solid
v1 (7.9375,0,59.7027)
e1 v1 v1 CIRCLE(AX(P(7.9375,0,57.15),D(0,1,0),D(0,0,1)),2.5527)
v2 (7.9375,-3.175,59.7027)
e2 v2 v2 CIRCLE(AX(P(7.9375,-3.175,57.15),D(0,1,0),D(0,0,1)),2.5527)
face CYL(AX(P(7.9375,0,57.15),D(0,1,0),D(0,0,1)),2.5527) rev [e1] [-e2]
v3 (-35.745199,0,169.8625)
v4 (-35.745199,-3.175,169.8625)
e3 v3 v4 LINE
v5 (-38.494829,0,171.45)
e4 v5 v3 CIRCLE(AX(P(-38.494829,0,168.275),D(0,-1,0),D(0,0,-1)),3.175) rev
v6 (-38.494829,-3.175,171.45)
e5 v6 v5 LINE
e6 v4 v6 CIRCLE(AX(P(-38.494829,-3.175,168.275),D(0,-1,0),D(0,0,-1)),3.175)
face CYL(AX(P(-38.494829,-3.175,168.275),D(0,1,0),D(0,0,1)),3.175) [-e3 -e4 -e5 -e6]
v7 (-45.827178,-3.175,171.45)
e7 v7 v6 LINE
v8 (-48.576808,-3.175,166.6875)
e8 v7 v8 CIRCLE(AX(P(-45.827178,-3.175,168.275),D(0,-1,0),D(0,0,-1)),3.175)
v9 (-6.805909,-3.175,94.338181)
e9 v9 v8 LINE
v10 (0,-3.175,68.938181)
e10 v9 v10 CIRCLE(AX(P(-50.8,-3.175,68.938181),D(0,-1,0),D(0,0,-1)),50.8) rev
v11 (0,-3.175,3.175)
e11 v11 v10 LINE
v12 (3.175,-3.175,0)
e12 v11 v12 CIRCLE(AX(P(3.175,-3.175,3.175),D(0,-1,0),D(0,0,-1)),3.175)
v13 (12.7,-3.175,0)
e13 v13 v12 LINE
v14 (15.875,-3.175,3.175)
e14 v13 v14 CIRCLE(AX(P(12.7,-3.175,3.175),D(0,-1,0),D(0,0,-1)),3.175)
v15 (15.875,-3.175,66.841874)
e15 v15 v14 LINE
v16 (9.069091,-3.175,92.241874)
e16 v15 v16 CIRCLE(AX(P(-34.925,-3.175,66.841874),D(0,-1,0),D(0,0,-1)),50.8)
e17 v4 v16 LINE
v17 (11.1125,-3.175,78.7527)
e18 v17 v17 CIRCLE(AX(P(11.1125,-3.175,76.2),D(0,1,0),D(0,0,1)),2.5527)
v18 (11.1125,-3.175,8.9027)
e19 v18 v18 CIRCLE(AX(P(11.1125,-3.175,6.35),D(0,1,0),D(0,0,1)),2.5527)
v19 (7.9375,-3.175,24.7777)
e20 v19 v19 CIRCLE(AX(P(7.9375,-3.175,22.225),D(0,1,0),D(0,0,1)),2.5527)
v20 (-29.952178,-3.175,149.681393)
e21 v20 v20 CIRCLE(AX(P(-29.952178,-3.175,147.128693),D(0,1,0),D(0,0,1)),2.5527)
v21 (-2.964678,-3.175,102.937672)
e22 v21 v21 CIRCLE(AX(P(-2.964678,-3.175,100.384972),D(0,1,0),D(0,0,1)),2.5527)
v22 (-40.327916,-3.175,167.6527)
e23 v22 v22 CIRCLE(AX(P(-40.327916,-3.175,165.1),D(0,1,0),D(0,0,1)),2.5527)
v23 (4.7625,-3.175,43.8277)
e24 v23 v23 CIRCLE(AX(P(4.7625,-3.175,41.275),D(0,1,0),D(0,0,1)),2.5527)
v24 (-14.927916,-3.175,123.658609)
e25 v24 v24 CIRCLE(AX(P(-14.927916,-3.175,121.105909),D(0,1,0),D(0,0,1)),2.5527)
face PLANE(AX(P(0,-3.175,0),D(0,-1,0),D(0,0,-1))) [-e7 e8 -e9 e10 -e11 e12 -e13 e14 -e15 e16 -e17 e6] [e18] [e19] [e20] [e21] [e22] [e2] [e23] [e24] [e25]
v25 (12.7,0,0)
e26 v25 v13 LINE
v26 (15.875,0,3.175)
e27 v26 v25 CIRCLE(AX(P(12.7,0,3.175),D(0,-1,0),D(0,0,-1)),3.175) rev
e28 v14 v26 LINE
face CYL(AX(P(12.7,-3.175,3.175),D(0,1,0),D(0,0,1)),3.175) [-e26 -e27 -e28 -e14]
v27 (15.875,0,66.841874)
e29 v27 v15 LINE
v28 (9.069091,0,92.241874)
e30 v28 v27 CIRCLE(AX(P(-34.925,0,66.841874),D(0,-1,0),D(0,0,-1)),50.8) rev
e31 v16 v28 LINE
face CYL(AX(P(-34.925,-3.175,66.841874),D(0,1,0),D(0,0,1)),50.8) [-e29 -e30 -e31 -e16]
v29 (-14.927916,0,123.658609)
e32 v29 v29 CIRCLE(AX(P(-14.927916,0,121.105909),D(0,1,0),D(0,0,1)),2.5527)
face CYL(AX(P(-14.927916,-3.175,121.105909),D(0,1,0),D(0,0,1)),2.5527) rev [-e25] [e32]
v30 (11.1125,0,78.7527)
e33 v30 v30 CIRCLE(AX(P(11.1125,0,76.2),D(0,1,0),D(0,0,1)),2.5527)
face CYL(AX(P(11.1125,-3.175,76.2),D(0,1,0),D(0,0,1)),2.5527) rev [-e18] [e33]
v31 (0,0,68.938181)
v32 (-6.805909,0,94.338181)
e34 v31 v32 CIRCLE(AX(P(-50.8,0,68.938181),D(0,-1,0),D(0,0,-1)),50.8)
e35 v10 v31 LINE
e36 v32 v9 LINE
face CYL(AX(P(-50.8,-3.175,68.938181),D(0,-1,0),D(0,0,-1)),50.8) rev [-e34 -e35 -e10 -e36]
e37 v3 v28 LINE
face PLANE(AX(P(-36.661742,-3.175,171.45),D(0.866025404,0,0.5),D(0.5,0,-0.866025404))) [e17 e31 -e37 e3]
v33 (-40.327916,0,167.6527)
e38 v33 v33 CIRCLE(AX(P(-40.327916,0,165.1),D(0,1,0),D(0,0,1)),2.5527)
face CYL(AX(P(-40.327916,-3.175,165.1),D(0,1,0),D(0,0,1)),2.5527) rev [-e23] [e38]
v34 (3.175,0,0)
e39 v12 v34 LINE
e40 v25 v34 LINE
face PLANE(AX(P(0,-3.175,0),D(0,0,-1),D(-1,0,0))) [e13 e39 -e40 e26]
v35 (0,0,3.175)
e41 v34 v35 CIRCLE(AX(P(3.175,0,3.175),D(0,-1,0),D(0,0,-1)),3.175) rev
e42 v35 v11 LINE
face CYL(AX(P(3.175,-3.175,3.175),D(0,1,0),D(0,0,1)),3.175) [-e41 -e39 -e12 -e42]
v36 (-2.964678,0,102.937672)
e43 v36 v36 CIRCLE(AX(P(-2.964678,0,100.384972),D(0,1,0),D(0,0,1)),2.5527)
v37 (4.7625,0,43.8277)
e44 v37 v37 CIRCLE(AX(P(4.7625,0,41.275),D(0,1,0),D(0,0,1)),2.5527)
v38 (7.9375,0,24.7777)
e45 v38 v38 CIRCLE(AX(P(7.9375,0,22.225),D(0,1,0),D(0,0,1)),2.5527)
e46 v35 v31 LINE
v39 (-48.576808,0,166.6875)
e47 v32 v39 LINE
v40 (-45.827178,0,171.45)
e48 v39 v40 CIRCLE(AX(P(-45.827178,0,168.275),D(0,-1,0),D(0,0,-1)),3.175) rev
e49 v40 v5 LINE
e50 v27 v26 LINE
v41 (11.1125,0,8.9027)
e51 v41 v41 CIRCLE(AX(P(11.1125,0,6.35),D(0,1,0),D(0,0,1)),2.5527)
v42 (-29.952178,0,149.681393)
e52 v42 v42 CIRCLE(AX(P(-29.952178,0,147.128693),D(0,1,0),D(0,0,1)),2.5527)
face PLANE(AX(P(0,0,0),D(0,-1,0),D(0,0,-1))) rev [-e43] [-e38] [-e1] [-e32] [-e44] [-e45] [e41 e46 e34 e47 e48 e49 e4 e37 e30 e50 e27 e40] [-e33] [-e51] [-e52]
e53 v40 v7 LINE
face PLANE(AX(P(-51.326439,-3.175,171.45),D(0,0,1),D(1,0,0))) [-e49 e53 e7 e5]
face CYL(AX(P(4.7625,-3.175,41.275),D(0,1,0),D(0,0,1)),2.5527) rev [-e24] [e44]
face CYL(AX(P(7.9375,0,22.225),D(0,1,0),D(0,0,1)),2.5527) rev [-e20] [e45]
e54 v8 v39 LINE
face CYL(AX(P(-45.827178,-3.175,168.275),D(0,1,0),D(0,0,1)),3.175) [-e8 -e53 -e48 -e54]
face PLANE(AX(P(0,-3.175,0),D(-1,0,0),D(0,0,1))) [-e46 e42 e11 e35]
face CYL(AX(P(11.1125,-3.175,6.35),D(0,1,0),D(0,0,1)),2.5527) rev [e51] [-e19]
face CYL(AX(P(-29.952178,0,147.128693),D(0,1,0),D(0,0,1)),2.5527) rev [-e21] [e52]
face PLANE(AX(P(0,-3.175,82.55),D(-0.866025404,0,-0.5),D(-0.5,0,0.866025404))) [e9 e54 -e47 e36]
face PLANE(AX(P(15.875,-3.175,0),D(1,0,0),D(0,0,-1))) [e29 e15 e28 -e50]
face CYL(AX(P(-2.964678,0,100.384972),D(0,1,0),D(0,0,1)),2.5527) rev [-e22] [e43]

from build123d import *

# Parameters (mm, degrees)
BASE_FLANGE1_DEPTH     = 3.175
SKETCH6_R              = 2.5527
CUT_EXTRUDE1_DEPTH     = 179.996051516
FILLET1_R              = 3.175
FILLET2_R              = 50.8
F_10_CLEARANCE_HOLE1_D = 5.1054


# Sheet-metal steps are written as plain solids
with BuildPart() as part:
    # Sketch1 → Base-Flange1 (new body)
    with BuildSketch(Plane(origin=(0, 0, 0), x_dir=(1, 0, 0), z_dir=(0, 1, 0))):
        Polygon((0, -82.55), (-51.326438931, -171.45), (-36.661742094, -171.45), (15.875, -80.45369343), (15.875, 0), (0, 0), align=None)
    extrude(amount=-BASE_FLANGE1_DEPTH)

    # Sketch6 → Cut-Extrude1 (cut, through all)
    with BuildSketch(Plane(origin=(0, 0, 0), x_dir=(1, 0, 0), z_dir=(0, 1, 0))):
        with Locations(Location((-40.327916303, -165.1, 0), (0, 0, 270))):
            Circle(SKETCH6_R)
        with Locations(Location((-14.927916303, -121.105909488, 0), (0, 0, 270))):
            Circle(SKETCH6_R)
        with Locations(Location((11.1125, -6.35, 0), (0, 0, 270))):
            Circle(SKETCH6_R)
        with Locations(Location((4.7625, -41.275, 0), (0, 0, 270))):
            Circle(SKETCH6_R)
        with Locations(Location((11.1125, -76.2, 0), (0, 0, 270))):
            Circle(SKETCH6_R)
    extrude(amount=-CUT_EXTRUDE1_DEPTH, mode=Mode.SUBTRACT)

    # Fillet1
    fillet1_edges = [part.edges().sort_by_distance(p)[0] for p in [
        (-36.661742094, -1.5875, 171.45),
        (-51.326438931, -1.5875, 171.45),
        (0, -1.5875, 0),
        (15.875, -1.5875, 0),
    ]]
    fillet(fillet1_edges, radius=FILLET1_R)

    # Fillet2
    fillet2_edges = [part.edges().sort_by_distance(p)[0] for p in [
        (0, -1.5875, 82.55),
        (15.875, -1.5875, 80.45369343),
    ]]
    fillet(fillet2_edges, radius=FILLET2_R)

    # #10 Clearance Hole1 (through all)
    with Locations(Plane(origin=(0, 0, 0), x_dir=(1, 0, 0), z_dir=(0, 1, 0))):
        with Locations((7.9375, -22.225), (7.9375, -57.15), (-2.964677617, -100.384972261), (-29.952177617, -147.12869343)):
            Hole(F_10_CLEARANCE_HOLE1_D / 2)


solid = part.part
